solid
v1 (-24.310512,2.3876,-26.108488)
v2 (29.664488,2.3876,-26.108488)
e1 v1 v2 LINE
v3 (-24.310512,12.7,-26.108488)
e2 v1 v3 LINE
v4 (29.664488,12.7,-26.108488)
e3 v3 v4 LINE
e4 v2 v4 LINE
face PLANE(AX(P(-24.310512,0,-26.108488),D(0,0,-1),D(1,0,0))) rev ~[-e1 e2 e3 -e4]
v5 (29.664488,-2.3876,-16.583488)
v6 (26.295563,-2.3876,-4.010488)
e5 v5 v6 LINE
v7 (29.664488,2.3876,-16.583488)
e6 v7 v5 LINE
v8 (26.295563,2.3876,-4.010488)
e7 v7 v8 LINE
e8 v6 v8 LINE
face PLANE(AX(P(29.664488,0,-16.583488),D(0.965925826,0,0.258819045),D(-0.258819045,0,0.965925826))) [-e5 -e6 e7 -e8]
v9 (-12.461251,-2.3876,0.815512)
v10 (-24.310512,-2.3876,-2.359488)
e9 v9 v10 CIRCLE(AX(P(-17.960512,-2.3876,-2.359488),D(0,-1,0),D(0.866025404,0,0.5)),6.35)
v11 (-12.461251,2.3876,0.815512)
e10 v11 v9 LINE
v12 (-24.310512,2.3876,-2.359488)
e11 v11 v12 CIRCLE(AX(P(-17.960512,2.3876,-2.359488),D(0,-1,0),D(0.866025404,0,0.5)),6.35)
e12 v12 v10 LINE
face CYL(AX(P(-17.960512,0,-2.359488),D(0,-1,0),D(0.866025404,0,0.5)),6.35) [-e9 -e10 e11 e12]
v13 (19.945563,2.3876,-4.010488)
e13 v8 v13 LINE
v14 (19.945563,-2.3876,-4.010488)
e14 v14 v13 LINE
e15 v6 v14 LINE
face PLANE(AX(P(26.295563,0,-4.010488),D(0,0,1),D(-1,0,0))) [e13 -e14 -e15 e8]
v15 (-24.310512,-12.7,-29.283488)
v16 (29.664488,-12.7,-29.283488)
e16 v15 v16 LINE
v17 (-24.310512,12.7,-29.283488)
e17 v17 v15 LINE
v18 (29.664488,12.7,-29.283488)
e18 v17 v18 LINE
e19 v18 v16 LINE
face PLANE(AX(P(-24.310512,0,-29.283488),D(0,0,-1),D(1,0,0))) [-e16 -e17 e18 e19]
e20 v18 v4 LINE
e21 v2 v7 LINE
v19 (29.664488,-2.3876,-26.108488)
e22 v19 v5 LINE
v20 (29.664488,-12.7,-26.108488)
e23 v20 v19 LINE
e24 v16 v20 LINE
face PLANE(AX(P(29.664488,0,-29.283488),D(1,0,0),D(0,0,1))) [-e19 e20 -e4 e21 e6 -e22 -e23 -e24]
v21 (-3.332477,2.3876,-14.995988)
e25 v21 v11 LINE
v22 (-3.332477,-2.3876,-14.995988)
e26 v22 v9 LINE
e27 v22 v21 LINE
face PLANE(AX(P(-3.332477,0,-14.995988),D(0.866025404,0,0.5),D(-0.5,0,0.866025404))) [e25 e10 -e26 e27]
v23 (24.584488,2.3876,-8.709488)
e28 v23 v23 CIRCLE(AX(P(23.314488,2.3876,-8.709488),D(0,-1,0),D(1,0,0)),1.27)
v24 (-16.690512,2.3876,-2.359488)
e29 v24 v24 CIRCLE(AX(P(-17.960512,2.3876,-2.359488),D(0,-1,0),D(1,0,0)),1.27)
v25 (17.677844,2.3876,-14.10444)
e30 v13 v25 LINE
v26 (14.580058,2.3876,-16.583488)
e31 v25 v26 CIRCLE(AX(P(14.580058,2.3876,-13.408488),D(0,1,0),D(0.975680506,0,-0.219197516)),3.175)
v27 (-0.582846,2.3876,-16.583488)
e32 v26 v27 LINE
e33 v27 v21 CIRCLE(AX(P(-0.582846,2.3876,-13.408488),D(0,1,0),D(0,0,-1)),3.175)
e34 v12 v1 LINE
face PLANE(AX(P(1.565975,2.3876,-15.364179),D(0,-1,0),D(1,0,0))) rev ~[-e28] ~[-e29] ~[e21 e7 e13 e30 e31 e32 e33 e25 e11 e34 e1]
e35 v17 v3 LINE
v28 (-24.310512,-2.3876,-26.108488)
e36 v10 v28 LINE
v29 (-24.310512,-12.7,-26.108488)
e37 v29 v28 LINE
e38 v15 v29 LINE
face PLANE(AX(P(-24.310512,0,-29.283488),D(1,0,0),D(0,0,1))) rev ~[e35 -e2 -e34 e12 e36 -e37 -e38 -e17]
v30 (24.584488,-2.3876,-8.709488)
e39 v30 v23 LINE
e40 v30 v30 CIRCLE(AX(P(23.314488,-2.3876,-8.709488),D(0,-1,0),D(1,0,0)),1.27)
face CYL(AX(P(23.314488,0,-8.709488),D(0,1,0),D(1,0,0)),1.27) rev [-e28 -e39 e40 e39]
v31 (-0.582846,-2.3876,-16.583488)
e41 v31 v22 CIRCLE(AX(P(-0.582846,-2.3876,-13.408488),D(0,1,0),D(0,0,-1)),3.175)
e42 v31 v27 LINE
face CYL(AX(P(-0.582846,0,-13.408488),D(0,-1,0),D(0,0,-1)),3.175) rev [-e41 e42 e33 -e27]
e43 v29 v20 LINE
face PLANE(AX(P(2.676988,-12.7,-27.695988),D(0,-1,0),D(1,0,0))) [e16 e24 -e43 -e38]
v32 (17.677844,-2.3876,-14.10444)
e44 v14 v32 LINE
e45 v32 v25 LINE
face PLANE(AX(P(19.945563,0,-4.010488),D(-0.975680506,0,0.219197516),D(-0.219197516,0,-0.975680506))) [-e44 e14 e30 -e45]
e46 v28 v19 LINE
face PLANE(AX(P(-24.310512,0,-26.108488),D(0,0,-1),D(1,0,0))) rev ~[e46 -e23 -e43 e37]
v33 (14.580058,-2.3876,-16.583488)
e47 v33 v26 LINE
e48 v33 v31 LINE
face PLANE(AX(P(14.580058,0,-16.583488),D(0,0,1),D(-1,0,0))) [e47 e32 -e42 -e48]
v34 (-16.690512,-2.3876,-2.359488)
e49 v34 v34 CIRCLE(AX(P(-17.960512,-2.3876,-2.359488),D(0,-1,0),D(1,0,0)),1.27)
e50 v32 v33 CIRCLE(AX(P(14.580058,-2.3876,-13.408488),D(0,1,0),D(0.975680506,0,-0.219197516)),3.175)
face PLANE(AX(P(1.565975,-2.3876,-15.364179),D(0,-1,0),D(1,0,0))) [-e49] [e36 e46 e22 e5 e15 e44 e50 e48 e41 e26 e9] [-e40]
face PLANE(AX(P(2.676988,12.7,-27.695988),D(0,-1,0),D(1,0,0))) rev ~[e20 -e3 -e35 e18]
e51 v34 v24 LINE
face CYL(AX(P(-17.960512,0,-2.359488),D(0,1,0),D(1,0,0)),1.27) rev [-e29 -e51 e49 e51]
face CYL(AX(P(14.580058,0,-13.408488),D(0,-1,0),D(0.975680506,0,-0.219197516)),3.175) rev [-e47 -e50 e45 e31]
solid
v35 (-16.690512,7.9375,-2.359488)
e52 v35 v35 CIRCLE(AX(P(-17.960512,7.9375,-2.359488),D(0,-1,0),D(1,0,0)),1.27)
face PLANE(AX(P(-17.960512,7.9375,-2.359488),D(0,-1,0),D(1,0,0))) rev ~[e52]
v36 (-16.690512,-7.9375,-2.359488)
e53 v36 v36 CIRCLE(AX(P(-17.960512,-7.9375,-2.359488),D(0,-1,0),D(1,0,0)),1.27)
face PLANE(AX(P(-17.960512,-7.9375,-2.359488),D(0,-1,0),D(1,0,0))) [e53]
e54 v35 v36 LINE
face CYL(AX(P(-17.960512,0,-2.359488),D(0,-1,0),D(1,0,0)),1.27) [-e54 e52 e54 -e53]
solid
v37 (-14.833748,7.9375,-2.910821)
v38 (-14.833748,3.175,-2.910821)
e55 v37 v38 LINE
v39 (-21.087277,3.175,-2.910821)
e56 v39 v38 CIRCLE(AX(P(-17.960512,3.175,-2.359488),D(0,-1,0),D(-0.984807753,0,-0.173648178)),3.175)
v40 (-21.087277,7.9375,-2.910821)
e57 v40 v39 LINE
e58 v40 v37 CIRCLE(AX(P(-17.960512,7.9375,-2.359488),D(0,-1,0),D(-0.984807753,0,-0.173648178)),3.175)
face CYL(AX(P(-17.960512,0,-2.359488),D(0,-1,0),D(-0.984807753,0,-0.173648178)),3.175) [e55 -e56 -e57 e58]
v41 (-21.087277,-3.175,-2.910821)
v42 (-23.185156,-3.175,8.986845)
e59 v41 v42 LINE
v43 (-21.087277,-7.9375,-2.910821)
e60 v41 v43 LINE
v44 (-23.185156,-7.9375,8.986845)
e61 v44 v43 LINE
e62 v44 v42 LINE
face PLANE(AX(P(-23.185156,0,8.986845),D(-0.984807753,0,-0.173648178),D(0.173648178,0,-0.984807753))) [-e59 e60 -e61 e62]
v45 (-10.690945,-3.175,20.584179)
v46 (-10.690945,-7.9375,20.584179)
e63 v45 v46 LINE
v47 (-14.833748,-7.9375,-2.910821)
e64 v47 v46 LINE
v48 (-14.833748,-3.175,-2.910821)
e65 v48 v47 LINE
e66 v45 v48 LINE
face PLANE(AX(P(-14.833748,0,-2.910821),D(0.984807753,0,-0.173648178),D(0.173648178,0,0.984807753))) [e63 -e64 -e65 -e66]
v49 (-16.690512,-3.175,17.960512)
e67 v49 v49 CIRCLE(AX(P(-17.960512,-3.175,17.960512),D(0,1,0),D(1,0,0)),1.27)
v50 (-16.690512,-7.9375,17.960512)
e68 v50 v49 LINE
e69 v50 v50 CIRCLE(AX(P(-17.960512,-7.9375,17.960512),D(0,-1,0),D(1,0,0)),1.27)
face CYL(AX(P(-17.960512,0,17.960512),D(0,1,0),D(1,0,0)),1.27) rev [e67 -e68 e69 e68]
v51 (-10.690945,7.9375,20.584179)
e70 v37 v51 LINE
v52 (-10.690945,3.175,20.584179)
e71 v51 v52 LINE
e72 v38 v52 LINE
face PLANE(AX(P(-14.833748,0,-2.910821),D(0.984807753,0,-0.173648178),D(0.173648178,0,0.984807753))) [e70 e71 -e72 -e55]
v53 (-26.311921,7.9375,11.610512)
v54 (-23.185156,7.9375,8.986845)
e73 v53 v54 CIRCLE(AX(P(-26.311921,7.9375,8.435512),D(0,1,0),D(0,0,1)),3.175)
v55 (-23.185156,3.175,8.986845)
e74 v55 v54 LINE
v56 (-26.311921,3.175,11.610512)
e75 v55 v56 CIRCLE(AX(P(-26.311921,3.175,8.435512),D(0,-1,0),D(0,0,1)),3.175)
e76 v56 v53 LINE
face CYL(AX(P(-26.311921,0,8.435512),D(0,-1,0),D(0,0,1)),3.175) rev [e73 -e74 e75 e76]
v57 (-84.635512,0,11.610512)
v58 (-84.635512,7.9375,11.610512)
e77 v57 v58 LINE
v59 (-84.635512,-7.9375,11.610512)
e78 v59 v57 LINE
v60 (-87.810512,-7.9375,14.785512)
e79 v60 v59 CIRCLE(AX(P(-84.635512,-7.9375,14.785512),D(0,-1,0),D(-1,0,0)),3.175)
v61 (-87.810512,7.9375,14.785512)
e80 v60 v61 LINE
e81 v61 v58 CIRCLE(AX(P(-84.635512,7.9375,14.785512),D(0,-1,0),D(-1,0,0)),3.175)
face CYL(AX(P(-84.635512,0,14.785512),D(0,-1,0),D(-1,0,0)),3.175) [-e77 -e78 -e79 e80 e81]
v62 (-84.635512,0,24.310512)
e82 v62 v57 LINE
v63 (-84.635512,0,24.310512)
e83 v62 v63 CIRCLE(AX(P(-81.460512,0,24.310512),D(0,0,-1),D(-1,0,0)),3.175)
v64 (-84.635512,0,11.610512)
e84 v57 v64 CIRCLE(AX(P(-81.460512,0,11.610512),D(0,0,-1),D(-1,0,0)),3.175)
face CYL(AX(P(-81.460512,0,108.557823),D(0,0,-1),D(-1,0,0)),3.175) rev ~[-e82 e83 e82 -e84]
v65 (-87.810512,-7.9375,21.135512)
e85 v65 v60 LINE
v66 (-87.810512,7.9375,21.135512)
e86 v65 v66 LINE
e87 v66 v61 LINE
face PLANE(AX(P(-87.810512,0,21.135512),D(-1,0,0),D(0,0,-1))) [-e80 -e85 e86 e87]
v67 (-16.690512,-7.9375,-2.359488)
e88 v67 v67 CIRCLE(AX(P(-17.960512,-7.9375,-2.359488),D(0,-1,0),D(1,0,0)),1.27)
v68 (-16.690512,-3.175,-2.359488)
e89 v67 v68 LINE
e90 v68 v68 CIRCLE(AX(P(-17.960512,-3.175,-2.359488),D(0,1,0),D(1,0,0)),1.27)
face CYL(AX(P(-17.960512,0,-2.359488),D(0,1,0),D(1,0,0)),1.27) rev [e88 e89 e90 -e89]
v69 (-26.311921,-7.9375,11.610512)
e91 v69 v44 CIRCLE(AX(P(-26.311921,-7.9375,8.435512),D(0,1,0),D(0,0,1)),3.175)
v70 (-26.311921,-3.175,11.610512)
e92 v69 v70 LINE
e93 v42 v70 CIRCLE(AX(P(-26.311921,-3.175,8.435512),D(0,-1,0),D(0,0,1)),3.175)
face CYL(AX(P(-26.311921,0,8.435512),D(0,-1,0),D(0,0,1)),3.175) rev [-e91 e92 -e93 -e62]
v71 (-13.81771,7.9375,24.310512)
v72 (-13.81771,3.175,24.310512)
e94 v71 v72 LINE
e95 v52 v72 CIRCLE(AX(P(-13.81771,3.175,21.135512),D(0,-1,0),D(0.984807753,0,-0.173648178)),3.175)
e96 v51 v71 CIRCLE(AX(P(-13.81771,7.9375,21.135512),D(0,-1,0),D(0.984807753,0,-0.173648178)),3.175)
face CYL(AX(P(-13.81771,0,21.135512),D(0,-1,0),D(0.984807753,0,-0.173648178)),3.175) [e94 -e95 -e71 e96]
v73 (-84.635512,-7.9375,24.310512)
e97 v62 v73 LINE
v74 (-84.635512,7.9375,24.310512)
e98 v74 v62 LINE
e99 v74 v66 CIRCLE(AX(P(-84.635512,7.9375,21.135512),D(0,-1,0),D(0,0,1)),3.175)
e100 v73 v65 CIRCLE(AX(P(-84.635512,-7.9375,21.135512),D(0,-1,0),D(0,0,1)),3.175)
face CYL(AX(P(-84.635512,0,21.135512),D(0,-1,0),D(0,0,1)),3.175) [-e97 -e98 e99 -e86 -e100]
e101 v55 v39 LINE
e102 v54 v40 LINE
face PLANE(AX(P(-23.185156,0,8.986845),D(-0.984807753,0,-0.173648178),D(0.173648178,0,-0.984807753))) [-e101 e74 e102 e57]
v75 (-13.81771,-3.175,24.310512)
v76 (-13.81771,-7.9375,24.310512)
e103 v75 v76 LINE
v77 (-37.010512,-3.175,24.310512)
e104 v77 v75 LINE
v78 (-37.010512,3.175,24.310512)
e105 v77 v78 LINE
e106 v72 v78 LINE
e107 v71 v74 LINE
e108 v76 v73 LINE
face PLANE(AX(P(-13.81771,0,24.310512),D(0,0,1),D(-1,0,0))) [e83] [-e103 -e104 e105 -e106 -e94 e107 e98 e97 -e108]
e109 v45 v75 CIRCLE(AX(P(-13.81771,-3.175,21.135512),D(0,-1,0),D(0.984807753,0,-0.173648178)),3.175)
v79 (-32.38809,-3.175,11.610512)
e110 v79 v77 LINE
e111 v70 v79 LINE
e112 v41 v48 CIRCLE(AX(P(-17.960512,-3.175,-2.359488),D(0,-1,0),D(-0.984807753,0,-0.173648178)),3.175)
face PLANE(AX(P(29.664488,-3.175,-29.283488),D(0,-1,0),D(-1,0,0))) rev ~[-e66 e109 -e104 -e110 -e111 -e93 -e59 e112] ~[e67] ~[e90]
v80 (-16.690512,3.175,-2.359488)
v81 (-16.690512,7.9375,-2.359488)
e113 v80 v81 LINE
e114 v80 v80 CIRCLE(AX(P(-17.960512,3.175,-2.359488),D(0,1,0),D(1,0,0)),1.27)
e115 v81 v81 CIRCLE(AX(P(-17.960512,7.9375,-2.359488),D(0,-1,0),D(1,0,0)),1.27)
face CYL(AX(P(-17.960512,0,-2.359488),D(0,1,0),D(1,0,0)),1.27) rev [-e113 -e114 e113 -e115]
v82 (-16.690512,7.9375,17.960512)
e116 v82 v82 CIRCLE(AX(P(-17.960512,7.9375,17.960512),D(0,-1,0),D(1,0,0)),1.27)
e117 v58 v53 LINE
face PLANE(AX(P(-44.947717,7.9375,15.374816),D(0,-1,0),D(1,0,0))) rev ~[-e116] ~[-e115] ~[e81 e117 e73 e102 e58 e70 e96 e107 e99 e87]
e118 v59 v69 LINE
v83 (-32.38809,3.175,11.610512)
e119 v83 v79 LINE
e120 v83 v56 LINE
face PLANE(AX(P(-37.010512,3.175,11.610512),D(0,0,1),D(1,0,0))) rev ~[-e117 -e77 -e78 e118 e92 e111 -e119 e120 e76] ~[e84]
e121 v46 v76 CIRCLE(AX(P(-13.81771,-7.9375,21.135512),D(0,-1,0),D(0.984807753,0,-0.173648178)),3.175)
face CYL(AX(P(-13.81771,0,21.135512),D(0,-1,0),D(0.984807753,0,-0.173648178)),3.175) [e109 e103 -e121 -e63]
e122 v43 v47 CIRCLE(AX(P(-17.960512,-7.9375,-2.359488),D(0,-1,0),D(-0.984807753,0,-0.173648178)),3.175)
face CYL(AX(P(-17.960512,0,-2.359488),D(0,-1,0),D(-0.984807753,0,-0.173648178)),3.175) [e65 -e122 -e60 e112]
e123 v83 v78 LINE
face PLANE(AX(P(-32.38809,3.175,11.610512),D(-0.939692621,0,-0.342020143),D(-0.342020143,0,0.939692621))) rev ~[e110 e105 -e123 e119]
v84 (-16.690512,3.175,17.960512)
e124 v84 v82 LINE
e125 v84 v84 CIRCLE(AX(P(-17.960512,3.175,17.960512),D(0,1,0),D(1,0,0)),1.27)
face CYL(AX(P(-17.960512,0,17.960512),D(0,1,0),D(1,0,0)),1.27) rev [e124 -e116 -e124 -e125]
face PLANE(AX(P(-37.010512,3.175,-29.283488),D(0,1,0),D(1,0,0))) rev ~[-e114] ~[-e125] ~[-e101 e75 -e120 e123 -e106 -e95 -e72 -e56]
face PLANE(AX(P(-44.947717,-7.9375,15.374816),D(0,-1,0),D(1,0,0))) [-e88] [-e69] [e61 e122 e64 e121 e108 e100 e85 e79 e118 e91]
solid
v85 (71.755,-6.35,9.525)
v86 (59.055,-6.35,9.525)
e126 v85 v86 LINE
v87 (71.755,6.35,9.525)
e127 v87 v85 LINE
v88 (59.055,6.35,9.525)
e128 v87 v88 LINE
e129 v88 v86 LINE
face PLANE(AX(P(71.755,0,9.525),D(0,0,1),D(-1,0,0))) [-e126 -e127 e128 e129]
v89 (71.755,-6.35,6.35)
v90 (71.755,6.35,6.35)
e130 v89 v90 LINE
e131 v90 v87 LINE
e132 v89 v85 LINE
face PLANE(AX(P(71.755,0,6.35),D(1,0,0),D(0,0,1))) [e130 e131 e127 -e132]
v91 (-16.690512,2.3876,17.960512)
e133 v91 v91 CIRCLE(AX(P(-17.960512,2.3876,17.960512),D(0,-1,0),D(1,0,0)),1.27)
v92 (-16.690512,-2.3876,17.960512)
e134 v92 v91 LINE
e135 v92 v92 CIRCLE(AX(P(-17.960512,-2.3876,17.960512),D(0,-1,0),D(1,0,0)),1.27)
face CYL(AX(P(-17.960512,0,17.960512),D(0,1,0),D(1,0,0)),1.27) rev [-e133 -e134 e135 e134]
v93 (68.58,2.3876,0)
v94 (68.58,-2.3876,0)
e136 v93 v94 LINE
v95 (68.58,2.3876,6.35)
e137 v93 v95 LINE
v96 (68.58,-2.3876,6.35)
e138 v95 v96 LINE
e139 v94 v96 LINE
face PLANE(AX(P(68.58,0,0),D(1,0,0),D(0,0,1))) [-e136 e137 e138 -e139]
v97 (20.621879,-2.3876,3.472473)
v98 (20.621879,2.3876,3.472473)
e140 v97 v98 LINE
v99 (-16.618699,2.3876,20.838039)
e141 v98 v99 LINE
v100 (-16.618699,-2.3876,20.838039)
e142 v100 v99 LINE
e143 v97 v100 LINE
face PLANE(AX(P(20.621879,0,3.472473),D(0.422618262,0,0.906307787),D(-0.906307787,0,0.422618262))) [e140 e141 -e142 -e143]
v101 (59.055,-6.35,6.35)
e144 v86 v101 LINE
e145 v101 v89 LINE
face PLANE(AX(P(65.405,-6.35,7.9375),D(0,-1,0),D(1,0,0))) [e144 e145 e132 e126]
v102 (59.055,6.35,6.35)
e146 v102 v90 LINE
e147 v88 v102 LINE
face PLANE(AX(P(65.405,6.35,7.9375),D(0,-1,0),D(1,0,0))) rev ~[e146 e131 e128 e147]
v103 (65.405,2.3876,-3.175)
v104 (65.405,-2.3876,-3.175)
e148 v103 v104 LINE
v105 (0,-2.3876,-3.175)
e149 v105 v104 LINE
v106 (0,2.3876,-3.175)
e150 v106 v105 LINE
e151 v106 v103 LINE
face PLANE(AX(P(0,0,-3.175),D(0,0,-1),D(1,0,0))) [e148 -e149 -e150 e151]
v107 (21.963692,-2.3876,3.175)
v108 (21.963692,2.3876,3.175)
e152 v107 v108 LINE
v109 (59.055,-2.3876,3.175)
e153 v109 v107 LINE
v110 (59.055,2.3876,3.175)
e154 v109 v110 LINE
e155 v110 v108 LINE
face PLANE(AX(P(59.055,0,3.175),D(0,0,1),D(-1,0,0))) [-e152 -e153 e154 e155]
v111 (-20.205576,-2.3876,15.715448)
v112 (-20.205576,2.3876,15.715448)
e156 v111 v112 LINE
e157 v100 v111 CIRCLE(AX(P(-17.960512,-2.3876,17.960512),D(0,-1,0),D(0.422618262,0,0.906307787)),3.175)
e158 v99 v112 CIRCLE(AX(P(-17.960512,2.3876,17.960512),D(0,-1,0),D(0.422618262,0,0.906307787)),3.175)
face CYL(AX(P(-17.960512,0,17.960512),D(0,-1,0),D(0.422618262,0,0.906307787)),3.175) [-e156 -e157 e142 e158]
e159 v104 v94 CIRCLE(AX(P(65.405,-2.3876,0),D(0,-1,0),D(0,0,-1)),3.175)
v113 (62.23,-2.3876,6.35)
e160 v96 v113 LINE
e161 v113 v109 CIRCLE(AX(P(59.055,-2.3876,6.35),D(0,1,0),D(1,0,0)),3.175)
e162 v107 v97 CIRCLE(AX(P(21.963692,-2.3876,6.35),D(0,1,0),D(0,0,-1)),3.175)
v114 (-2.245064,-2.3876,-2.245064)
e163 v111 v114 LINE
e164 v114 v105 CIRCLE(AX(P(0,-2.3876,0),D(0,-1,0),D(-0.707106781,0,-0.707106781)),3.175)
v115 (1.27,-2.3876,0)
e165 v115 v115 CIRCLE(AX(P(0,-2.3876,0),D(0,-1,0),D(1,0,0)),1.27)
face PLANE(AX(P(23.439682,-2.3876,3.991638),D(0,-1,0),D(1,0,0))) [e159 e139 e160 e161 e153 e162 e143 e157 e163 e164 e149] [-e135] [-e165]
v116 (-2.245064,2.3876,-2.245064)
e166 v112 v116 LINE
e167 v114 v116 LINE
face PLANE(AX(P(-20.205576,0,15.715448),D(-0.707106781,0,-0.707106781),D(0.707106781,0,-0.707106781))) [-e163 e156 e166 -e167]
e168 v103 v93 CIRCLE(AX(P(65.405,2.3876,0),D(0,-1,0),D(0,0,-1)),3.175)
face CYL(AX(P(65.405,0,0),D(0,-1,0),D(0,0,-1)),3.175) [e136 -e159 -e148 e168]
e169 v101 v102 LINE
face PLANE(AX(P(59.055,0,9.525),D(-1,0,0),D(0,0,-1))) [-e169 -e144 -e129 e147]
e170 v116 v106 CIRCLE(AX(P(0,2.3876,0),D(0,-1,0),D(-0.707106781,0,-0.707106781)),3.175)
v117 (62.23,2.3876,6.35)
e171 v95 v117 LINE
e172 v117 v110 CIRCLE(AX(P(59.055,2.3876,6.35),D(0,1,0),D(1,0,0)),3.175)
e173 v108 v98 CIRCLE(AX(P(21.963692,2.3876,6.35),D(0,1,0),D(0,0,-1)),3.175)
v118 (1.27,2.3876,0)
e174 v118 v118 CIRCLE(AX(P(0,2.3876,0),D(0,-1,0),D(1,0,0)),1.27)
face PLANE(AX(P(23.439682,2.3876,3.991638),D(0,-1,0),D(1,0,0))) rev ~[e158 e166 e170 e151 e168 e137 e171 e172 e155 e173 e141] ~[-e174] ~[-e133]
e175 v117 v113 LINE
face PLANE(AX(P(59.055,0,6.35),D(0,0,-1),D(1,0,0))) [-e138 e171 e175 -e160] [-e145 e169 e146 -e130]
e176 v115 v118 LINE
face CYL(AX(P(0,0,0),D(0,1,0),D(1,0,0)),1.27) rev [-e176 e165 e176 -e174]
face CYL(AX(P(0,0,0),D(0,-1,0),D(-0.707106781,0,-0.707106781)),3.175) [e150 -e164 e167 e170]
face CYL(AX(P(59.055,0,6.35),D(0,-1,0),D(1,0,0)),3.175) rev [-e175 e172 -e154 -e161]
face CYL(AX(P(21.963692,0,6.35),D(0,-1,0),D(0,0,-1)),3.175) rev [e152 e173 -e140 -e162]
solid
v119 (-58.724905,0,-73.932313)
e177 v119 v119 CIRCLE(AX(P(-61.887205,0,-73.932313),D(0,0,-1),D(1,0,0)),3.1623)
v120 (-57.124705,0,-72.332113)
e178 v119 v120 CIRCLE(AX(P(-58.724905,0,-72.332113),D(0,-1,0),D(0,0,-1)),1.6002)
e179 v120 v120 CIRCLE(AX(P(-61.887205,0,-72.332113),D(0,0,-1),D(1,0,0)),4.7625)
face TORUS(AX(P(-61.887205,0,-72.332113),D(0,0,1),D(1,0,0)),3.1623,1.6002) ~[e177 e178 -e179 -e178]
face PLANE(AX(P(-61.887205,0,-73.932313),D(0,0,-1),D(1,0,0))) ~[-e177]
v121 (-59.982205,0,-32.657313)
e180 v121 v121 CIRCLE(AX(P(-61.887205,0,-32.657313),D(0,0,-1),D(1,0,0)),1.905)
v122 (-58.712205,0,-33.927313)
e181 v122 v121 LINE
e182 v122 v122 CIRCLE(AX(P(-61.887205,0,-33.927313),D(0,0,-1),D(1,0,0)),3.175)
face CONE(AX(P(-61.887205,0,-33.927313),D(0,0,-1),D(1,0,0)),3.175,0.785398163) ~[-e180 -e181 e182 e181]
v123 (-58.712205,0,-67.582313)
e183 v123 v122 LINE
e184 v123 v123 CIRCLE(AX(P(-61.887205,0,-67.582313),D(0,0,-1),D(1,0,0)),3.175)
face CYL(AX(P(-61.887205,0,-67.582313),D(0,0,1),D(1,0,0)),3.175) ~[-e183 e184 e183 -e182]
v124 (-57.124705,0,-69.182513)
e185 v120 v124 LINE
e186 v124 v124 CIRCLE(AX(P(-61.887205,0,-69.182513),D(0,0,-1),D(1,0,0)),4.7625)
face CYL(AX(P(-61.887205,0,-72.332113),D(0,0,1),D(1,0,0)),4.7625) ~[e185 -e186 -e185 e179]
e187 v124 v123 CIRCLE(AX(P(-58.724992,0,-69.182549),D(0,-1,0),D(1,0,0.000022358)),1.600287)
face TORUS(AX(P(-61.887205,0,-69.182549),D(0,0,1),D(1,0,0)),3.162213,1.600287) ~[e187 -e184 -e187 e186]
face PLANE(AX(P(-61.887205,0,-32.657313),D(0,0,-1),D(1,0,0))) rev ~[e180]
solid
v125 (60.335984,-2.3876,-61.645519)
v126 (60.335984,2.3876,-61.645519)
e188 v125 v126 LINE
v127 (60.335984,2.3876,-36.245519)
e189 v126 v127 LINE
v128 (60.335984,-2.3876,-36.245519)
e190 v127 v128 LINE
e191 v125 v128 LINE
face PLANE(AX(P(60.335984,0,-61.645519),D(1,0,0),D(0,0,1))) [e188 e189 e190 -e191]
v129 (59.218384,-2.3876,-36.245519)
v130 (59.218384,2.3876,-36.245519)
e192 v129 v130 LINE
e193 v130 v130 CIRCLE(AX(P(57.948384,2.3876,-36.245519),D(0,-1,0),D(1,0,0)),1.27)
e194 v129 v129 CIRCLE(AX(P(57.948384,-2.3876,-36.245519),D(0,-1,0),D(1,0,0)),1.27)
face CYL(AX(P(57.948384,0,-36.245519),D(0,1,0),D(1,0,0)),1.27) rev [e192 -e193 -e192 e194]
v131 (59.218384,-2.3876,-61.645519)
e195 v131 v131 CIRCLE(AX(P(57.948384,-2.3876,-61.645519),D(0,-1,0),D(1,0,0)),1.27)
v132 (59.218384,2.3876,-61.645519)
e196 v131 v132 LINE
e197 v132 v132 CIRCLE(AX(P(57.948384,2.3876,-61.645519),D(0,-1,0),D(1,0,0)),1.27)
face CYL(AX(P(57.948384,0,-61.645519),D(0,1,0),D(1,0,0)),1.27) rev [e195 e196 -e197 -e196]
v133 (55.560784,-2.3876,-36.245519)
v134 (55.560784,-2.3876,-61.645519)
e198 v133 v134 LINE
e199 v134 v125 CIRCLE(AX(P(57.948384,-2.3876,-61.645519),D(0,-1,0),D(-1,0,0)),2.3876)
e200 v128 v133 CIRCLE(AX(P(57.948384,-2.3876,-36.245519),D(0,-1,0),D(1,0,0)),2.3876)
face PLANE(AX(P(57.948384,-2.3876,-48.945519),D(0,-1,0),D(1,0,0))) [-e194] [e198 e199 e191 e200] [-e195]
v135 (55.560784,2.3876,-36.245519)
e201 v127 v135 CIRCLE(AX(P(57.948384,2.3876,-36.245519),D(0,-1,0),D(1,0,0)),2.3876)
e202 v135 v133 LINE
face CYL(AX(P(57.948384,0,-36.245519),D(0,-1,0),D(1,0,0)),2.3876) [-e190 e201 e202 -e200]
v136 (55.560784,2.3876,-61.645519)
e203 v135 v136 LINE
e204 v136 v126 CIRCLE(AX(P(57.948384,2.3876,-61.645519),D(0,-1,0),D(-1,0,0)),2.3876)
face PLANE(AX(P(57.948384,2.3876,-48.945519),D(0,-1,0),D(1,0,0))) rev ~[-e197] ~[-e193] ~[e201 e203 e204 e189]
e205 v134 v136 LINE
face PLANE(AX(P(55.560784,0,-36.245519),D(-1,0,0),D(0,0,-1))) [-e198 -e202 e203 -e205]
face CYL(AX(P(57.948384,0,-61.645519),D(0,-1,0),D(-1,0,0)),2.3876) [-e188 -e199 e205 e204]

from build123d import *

# Parameters (mm, degrees)
F6_SIZE2  = 1.27
F6_SIZE   = 1.27
F3_R      = 1.27
F7_DEPTH  = 2.3876
F2_W      = 53.975
F2_H      = 3.175
F8_DEPTH  = 12.7
F2_R      = 1.27
F9_DEPTH  = 2.3876
F0_R      = 1.27
F10_DEPTH = 2.3876
F11_DEPTH = 6.35
F1_R      = 1.27
F12_DEPTH = 7.9375
F13_W     = 12.7
F13_H     = 6.35
F14_DEPTH = 53.595
F16_DEPTH = 6.35
F18_D     = 6.35
F19_DEPTH = 7.9375


# Not quite as in the source:
# - ends of sketch curves that miss each other by under 0.0002 mm in the source are joined


with BuildPart() as f5:
    # F4 (on Front) → F5 (revolve)
    with BuildSketch(Plane.XZ):
        with BuildLine():
            Line((-58.7122046471, -67.5823132604), (-58.7122046471, -32.6573132604))
            Line((-58.7122046471, -32.6573132604), (-61.8872046471, -32.6573132604))
            Line((-61.8872046471, -32.6573132604), (-61.8872046471, -73.9323132604))
            Line((-61.8872046471, -73.9323132604), (-58.7249046471, -73.9323132604))
            ThreePointArc((-58.7249046471, -73.9323132604), (-57.5933923758, -73.4636255317), (-57.1247046471, -72.3321132604))
            Line((-57.1247046471, -72.3321132604), (-57.1247046471, -69.1825132604))
            ThreePointArc((-57.1247046471, -69.1825132604), (-57.5889112624, -68.0554999198), (-58.7122046471, -67.5823132604))
        make_face()
    revolve(axis=Axis((-61.8872046471, 0, -53.2948132604), (0, 0, -1)))

    # F6
    f6_edges = [f5.edges().sort_by_distance(p)[0] for p in [
        (-65.062205, 0, -32.657313),
    ]]
    chamfer(f6_edges, length=F6_SIZE, length2=F6_SIZE2)


with BuildPart() as f7:
    # F3 (on Front) → F7 (new body, symmetric)
    with BuildSketch(Plane.XZ):
        with BuildLine():
            Line((60.335984434, -61.6455189884), (60.335984434, -36.2455189884))
            ThreePointArc((60.335984434, -36.2455189884), (57.948384434, -33.8579189884), (55.560784434, -36.2455189884))
            Line((55.560784434, -36.2455189884), (55.560784434, -61.6455189884))
            ThreePointArc((55.560784434, -61.6455189884), (57.948384434, -64.0331189884), (60.335984434, -61.6455189884))
        make_face()
        with Locations((57.948384434, -61.6455189884)):
            Circle(F3_R, mode=Mode.SUBTRACT)
        with Locations((57.948384434, -36.2455189884)):
            Circle(F3_R, mode=Mode.SUBTRACT)
    extrude(amount=F7_DEPTH, both=True)


with BuildPart() as f8:
    # F2 (on Front) → F8 (new body, symmetric)
    with BuildSketch(Plane.XZ):
        with Locations((2.6769877579, -27.6959877579)):
            Rectangle(F2_W, F2_H)
    extrude(amount=F8_DEPTH, both=True)

    # F2 (on Front) → F9 (join, symmetric)
    with BuildSketch(Plane.XZ):
        with BuildLine():
            Line((-3.3324771468, -14.9959877579), (-12.4612509281, 0.8155122421))
            ThreePointArc((-12.4612509281, 0.8155122421), (-19.6040131785, 3.7741412391), (-24.3105122421, -2.3594877579))
            Line((-24.3105122421, -2.3594877579), (-24.3105122421, -26.1084877579))
            Line((-24.3105122421, -26.1084877579), (29.6644877579, -26.1084877579))
            Line((29.6644877579, -26.1084877579), (29.6644877579, -16.5834877579))
            Line((29.6644877579, -16.5834877579), (26.2955625614, -4.0104877579))
            Line((26.2955625614, -4.0104877579), (19.9455625614, -4.0104877579))
            Line((19.9455625614, -4.0104877579), (17.677843549, -14.1044398719))
            ThreePointArc((17.677843549, -14.1044398719), (16.5638645169, -15.8874263374), (14.5800579439, -16.5834877579))
            Line((14.5800579439, -16.5834877579), (-0.5828464898, -16.5834877579))
            ThreePointArc((-0.5828464898, -16.5834877579), (-2.1703464898, -16.1581184149), (-3.3324771468, -14.9959877579))
        make_face()
        with Locations((-17.9605122421, -2.3594877579)):
            Circle(F2_R, mode=Mode.SUBTRACT)
        with Locations((23.3144877579, -8.7094877579)):
            Circle(F2_R, mode=Mode.SUBTRACT)
    extrude(amount=F9_DEPTH, both=True)


with BuildPart() as f10:
    # F0 (on Front) → F10 (new body, symmetric)
    with BuildSketch(Plane.XZ):
        with BuildLine():
            ThreePointArc((-2.2450640303, -2.2450640303), (-1.2150198978, -2.9333175157), (0, -3.175))
            Line((0, -3.175), (59.055, -3.175))
            Line((59.055, -3.175), (65.405, -3.175))
            ThreePointArc((65.405, -3.175), (67.6500640303, -2.2450640303), (68.58, 0))
            Line((68.58, 0), (68.58, 6.35))
            Line((68.58, 6.35), (62.23, 6.35))
            ThreePointArc((62.23, 6.35), (61.3000640303, 4.1049359697), (59.055, 3.175))
            Line((59.055, 3.175), (21.9636916648, 3.175))
            ThreePointArc((21.9636916648, 3.175), (21.2764958906, 3.2502601774), (20.6218786838, 3.4724727762))
            Line((20.6218786838, 3.4724727762), (-16.6186992611, 20.838039466))
            ThreePointArc((-16.6186992611, 20.838039466), (-20.5613199828, 19.7816174276), (-20.2055762724, 15.7154482119))
            Line((-20.2055762724, 15.7154482119), (-2.2450640303, -2.2450640303))
        make_face()
        Circle(F0_R, mode=Mode.SUBTRACT)
        with Locations((-17.9605122421, 17.9605122421)):
            Circle(F0_R, mode=Mode.SUBTRACT)
    extrude(amount=F10_DEPTH, both=True)

    # F0 (on Front) → F11 (join, symmetric)
    with BuildSketch(Plane.XZ):
        Polygon((62.23, 6.35), (68.58, 6.35), (71.755, 6.35), (71.755, 9.525), (59.055, 9.525), (59.055, 6.35), align=None)
    extrude(amount=F11_DEPTH, both=True)


with BuildPart() as f12:
    # F1 (on Front) → F12 (new body, symmetric)
    with BuildSketch(Plane.XZ):
        with BuildLine():
            ThreePointArc((-21.087276858, -2.910820722), (-18.2372317254, 0.8034304086), (-14.7855122421, -2.3594877579))
            ThreePointArc((-14.7855122421, -2.3594877579), (-14.7975940757, -2.6362072411), (-14.8337476263, -2.910820722))
            Line((-14.8337476263, -2.910820722), (-10.6909452146, 20.584179278))
            ThreePointArc((-10.6909452146, 20.584179278), (-11.3855187235, 23.1763629029), (-13.8177098304, 24.3105122421))
            Line((-13.8177098304, 24.3105122421), (-84.6355122421, 24.3105122421))
            ThreePointArc((-84.6355122421, 24.3105122421), (-86.8805762724, 23.3805762724), (-87.8105122421, 21.1355122421))
            Line((-87.8105122421, 21.1355122421), (-87.8105122421, 14.7855122421))
            ThreePointArc((-87.8105122421, 14.7855122421), (-86.8805762724, 12.5404482119), (-84.6355122421, 11.6105122421))
            Line((-84.6355122421, 11.6105122421), (-26.3119209844, 11.6105122421))
            ThreePointArc((-26.3119209844, 11.6105122421), (-24.2710703236, 10.867703349), (-23.1851563685, 8.9868452062))
            Line((-23.1851563685, 8.9868452062), (-21.087276858, -2.910820722))
        make_face()
        with Locations((-17.9605122421, 17.9605122421)):
            Circle(F1_R, mode=Mode.SUBTRACT)
        with BuildLine():
            ThreePointArc((-14.8337476263, -2.910820722), (-14.7975940757, -2.6362072411), (-14.7855122421, -2.3594877579))
            ThreePointArc((-14.7855122421, -2.3594877579), (-18.2372317254, 0.8034304086), (-21.087276858, -2.910820722))
            ThreePointArc((-21.087276858, -2.910820722), (-17.9605122421, -5.5344877579), (-14.8337476263, -2.910820722))
        make_face()
        with Locations((-17.9605122421, -2.3594877579)):
            Circle(F1_R, mode=Mode.SUBTRACT)
    extrude(amount=F12_DEPTH, both=True)

    # F13 (on face) → F14 (cut, through all)
    with BuildSketch(Plane(origin=(0, 0, -29.2834877579), x_dir=(1, 0, 0), z_dir=(0, 0, -1))):
        with Locations((-30.6605122421, 0)):
            Rectangle(F13_W, F13_H)
        Polygon((29.6644877579, -2.3876), (29.6644877579, 2.3876), (29.6644877579, 3.175), (-24.3105122421, 3.175), (-24.3105122421, -3.175), (29.6644877579, -3.175), align=None)
    extrude(amount=-F14_DEPTH, mode=Mode.SUBTRACT)

    # F15 (on face) → F16 (join, through all)
    with BuildSketch(Plane.XZ.offset(-3.175)):
        Polygon((-32.388090267, 11.6105122421), (-37.0105122421, 24.3105122421), (-37.0105122421, 11.6105122421), align=None)
    extrude(amount=F16_DEPTH)

    # F18 (through all)
    with Locations(Plane.XY.offset(24.3105122421)):
        with Locations((-81.4605122421, 0)):
            Hole(F18_D / 2)


with BuildPart() as f19:
    # F1 (on Front) → F19 (new body, symmetric)
    with BuildSketch(Plane.XZ):
        with Locations((-17.9605122421, -2.3594877579)):
            Circle(F1_R)
    extrude(amount=F19_DEPTH, both=True)


solid = Compound([f5.part, f7.part, f8.part, f10.part, f12.part, f19.part])
